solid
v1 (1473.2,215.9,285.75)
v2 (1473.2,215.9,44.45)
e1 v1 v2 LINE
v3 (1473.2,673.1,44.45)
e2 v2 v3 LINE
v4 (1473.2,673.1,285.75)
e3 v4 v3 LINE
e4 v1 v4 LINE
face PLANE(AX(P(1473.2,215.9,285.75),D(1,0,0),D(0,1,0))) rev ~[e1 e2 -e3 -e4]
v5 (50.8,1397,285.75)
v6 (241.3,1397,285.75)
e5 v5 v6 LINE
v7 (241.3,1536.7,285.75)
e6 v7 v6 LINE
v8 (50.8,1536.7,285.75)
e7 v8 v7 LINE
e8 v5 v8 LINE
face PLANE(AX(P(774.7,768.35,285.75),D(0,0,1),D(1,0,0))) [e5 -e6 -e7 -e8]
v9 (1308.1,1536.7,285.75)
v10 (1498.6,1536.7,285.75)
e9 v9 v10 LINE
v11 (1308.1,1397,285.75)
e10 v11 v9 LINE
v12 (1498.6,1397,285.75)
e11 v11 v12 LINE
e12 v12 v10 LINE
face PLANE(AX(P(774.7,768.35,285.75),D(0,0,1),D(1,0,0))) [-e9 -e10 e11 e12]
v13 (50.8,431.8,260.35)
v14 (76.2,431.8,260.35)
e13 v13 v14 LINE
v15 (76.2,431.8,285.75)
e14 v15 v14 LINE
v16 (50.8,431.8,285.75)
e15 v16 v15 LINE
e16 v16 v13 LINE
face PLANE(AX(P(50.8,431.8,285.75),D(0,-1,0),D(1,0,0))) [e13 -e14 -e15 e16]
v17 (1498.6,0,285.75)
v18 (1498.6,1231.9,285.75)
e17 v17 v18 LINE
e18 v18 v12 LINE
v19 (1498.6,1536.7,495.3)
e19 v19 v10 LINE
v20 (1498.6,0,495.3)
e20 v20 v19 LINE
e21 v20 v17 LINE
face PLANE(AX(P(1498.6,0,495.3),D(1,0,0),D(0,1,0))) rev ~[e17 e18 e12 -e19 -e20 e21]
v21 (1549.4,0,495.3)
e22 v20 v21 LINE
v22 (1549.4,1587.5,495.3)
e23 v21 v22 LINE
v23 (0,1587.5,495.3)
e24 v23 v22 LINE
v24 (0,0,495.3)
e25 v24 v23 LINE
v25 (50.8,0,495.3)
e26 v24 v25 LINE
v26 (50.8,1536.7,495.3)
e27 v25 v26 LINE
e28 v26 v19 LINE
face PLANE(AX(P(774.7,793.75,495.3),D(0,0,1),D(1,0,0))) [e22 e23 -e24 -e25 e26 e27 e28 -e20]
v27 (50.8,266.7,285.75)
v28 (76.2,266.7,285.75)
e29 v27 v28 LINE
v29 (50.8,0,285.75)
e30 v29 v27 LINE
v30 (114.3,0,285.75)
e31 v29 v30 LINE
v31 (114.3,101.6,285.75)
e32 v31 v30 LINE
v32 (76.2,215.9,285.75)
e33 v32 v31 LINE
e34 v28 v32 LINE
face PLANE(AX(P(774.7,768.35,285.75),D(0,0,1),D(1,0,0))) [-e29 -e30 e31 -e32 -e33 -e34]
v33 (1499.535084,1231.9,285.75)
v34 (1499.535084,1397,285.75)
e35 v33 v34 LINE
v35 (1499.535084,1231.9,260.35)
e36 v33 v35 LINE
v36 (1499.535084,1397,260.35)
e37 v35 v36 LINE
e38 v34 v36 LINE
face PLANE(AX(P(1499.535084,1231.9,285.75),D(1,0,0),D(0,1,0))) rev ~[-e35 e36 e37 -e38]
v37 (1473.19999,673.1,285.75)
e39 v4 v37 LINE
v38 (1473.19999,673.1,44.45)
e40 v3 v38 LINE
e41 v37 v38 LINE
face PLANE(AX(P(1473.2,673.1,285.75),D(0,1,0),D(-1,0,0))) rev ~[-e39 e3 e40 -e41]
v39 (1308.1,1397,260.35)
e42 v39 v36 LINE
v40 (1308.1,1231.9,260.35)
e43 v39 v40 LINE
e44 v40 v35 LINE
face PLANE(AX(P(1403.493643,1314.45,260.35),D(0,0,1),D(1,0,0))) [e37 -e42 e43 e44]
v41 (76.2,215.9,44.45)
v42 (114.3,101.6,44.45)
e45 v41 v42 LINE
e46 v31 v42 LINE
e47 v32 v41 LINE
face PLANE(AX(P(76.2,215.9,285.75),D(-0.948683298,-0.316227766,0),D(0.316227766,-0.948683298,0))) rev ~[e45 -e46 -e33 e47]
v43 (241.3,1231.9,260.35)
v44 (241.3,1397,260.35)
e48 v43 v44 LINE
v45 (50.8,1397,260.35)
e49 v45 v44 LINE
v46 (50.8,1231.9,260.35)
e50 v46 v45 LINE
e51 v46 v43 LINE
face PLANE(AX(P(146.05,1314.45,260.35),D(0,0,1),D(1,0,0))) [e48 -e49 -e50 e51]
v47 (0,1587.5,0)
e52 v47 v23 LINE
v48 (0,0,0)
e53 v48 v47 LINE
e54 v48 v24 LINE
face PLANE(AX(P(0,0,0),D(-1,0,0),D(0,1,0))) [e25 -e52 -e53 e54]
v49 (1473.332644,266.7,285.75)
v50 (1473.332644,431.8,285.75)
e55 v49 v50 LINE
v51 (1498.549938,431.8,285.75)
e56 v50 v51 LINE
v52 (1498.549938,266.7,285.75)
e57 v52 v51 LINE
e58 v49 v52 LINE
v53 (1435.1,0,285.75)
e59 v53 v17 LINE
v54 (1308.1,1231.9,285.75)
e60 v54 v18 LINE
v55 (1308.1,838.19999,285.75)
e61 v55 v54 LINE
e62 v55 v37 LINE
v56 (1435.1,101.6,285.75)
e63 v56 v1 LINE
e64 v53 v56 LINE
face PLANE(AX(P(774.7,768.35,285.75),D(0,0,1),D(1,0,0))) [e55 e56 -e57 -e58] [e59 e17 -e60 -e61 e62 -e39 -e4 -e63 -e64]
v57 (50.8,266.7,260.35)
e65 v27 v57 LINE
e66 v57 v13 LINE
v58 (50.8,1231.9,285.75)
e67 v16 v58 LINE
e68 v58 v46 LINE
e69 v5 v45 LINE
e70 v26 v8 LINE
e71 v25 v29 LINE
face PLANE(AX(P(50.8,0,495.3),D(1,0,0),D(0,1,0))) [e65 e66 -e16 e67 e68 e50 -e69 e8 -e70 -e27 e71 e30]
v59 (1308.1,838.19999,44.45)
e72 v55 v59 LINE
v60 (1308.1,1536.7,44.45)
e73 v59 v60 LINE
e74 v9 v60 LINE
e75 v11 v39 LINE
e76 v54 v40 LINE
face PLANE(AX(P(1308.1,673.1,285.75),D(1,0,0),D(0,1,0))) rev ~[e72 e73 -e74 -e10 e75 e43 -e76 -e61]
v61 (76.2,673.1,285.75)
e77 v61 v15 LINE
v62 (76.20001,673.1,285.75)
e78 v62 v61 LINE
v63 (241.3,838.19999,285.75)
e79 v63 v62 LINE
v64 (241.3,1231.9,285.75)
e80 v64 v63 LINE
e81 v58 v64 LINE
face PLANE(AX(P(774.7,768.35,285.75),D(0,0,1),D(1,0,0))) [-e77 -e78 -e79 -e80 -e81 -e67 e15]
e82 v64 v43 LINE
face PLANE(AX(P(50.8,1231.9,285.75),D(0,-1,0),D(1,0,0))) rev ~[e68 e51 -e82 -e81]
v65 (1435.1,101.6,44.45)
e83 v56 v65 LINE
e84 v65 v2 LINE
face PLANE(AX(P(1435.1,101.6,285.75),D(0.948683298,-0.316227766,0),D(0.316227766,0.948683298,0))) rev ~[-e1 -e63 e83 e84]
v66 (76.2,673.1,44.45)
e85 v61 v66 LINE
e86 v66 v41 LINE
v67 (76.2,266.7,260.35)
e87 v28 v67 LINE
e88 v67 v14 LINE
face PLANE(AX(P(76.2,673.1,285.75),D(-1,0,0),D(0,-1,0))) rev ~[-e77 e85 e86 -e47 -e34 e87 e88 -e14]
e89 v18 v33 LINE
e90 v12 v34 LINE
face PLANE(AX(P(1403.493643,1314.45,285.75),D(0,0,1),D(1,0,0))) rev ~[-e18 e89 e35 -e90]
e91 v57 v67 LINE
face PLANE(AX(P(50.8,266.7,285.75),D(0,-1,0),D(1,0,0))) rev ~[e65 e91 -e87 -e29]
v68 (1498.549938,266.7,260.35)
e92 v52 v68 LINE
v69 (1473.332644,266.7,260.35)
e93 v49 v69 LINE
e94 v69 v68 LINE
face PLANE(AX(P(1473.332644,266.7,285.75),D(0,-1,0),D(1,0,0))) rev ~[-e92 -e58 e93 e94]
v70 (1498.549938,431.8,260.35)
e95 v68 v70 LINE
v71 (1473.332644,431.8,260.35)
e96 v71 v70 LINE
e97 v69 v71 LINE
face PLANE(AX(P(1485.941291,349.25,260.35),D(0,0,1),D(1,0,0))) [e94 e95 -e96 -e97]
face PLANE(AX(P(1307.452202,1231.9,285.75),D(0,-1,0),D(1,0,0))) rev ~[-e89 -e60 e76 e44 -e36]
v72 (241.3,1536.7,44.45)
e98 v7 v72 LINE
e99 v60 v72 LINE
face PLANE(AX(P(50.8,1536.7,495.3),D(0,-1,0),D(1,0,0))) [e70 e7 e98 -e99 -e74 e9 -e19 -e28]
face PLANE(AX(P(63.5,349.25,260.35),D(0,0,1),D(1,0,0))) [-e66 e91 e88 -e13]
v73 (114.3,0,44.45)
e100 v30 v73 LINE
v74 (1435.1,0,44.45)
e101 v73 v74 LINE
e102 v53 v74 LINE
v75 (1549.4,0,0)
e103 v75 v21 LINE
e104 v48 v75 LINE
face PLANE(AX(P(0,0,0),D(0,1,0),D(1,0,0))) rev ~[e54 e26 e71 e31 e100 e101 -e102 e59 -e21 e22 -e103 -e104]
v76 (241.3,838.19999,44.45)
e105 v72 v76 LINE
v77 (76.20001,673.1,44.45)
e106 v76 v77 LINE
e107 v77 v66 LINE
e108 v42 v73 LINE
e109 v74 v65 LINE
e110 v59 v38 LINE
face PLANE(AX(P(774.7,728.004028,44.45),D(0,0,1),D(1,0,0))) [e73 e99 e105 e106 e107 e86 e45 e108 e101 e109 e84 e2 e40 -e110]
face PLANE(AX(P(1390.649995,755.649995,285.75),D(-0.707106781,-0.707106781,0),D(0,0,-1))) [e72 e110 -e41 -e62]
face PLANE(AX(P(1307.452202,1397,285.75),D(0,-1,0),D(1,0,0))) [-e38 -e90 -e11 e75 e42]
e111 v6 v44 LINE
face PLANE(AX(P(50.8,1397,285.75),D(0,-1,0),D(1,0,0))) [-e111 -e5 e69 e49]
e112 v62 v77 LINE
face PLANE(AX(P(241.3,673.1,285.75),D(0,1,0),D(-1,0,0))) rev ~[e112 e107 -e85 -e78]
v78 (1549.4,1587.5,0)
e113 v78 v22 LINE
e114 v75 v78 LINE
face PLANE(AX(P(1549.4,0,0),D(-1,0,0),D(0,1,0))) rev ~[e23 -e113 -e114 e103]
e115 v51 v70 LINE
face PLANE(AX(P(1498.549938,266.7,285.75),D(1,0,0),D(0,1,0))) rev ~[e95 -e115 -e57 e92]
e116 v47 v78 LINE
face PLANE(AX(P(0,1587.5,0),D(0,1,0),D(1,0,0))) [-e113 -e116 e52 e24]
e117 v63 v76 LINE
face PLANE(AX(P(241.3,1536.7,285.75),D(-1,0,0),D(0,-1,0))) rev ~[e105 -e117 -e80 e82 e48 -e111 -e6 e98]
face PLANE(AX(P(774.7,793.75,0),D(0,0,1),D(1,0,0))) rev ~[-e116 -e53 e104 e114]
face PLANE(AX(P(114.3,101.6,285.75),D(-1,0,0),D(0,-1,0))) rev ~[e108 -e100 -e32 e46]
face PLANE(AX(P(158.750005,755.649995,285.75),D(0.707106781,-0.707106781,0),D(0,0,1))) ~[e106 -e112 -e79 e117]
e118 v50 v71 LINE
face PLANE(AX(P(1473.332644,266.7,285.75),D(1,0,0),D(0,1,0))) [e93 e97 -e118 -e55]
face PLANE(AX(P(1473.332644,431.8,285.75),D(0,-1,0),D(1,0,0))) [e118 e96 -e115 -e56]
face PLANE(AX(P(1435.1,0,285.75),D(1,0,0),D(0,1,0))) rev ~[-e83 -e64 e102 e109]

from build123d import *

# Parameters (mm, degrees)
F0_W     = 1549.4
F0_H     = 1587.5
F1_DEPTH = 495.3
F2_W     = 1447.8
F2_H     = 1536.7
F3_DEPTH = 209.55
F5_DEPTH = 241.3
F6_SIZE  = 165.09999
F7_SIZE  = 165.09999
F8_W     = 192.0828819275
F8_H     = 165.1
F8_W_2   = 25.4
F8_W_3   = 25.217294693
F8_W_4   = 190.5
F9_DEPTH = 25.4


# Not quite as in the source:
# - a fillet or chamfer is up to 0.001 mm smaller than in the source, because OpenCascade refuses the exact size


with BuildPart() as f1:
    # F0 (on Top) → F1 (new body)
    with BuildSketch(Plane.XY):
        with Locations((774.7, 793.75)):
            Rectangle(F0_W, F0_H)
    extrude(amount=F1_DEPTH)

    # F2 (on face) → F3 (cut)
    with BuildSketch(Plane.XY.offset(495.3)):
        with Locations((774.7, 768.35)):
            Rectangle(F2_W, F2_H)
    extrude(amount=-F3_DEPTH, mode=Mode.SUBTRACT)

    # F4 (on face) → F5 (cut)
    with BuildSketch(Plane.XY.offset(285.75)):
        Polygon((114.3, 101.6), (114.3, 0), (1435.1, 0), (1435.1, 101.6), (1473.2, 215.9), (1473.2, 673.1), (1308.1, 673.1), (1308.1, 1536.7), (241.3, 1536.7), (241.3, 673.1), (76.2, 673.1), (76.2, 215.9), align=None)
    extrude(amount=-F5_DEPTH, mode=Mode.SUBTRACT)

    # F6 (size 165.1 in the source; OpenCascade refuses exactly that, so slightly less here)
    f6_edges = [f1.edges().sort_by_distance(p)[0] for p in [
        (241.3, 673.1, 165.1),
    ]]
    chamfer(f6_edges, length=F6_SIZE)

    # F7 (size 165.1 in the source; OpenCascade refuses exactly that, so slightly less here)
    f7_edges = [f1.edges().sort_by_distance(p)[0] for p in [
        (1308.1, 673.1, 165.1),
    ]]
    chamfer(f7_edges, length=F7_SIZE)

    # F8 (on face) → F9 (cut)
    with BuildSketch(Plane.XY.offset(285.75)):
        with Locations((1403.493642807, 1314.45)):
            Rectangle(F8_W, F8_H)
        with Locations((63.5, 349.25)):
            Rectangle(F8_W_2, F8_H)
        with Locations((1485.9412908554, 349.25)):
            Rectangle(F8_W_3, F8_H)
        with Locations((146.05, 1314.45)):
            Rectangle(F8_W_4, F8_H)
    extrude(amount=-F9_DEPTH, mode=Mode.SUBTRACT)


solid = f1.part
